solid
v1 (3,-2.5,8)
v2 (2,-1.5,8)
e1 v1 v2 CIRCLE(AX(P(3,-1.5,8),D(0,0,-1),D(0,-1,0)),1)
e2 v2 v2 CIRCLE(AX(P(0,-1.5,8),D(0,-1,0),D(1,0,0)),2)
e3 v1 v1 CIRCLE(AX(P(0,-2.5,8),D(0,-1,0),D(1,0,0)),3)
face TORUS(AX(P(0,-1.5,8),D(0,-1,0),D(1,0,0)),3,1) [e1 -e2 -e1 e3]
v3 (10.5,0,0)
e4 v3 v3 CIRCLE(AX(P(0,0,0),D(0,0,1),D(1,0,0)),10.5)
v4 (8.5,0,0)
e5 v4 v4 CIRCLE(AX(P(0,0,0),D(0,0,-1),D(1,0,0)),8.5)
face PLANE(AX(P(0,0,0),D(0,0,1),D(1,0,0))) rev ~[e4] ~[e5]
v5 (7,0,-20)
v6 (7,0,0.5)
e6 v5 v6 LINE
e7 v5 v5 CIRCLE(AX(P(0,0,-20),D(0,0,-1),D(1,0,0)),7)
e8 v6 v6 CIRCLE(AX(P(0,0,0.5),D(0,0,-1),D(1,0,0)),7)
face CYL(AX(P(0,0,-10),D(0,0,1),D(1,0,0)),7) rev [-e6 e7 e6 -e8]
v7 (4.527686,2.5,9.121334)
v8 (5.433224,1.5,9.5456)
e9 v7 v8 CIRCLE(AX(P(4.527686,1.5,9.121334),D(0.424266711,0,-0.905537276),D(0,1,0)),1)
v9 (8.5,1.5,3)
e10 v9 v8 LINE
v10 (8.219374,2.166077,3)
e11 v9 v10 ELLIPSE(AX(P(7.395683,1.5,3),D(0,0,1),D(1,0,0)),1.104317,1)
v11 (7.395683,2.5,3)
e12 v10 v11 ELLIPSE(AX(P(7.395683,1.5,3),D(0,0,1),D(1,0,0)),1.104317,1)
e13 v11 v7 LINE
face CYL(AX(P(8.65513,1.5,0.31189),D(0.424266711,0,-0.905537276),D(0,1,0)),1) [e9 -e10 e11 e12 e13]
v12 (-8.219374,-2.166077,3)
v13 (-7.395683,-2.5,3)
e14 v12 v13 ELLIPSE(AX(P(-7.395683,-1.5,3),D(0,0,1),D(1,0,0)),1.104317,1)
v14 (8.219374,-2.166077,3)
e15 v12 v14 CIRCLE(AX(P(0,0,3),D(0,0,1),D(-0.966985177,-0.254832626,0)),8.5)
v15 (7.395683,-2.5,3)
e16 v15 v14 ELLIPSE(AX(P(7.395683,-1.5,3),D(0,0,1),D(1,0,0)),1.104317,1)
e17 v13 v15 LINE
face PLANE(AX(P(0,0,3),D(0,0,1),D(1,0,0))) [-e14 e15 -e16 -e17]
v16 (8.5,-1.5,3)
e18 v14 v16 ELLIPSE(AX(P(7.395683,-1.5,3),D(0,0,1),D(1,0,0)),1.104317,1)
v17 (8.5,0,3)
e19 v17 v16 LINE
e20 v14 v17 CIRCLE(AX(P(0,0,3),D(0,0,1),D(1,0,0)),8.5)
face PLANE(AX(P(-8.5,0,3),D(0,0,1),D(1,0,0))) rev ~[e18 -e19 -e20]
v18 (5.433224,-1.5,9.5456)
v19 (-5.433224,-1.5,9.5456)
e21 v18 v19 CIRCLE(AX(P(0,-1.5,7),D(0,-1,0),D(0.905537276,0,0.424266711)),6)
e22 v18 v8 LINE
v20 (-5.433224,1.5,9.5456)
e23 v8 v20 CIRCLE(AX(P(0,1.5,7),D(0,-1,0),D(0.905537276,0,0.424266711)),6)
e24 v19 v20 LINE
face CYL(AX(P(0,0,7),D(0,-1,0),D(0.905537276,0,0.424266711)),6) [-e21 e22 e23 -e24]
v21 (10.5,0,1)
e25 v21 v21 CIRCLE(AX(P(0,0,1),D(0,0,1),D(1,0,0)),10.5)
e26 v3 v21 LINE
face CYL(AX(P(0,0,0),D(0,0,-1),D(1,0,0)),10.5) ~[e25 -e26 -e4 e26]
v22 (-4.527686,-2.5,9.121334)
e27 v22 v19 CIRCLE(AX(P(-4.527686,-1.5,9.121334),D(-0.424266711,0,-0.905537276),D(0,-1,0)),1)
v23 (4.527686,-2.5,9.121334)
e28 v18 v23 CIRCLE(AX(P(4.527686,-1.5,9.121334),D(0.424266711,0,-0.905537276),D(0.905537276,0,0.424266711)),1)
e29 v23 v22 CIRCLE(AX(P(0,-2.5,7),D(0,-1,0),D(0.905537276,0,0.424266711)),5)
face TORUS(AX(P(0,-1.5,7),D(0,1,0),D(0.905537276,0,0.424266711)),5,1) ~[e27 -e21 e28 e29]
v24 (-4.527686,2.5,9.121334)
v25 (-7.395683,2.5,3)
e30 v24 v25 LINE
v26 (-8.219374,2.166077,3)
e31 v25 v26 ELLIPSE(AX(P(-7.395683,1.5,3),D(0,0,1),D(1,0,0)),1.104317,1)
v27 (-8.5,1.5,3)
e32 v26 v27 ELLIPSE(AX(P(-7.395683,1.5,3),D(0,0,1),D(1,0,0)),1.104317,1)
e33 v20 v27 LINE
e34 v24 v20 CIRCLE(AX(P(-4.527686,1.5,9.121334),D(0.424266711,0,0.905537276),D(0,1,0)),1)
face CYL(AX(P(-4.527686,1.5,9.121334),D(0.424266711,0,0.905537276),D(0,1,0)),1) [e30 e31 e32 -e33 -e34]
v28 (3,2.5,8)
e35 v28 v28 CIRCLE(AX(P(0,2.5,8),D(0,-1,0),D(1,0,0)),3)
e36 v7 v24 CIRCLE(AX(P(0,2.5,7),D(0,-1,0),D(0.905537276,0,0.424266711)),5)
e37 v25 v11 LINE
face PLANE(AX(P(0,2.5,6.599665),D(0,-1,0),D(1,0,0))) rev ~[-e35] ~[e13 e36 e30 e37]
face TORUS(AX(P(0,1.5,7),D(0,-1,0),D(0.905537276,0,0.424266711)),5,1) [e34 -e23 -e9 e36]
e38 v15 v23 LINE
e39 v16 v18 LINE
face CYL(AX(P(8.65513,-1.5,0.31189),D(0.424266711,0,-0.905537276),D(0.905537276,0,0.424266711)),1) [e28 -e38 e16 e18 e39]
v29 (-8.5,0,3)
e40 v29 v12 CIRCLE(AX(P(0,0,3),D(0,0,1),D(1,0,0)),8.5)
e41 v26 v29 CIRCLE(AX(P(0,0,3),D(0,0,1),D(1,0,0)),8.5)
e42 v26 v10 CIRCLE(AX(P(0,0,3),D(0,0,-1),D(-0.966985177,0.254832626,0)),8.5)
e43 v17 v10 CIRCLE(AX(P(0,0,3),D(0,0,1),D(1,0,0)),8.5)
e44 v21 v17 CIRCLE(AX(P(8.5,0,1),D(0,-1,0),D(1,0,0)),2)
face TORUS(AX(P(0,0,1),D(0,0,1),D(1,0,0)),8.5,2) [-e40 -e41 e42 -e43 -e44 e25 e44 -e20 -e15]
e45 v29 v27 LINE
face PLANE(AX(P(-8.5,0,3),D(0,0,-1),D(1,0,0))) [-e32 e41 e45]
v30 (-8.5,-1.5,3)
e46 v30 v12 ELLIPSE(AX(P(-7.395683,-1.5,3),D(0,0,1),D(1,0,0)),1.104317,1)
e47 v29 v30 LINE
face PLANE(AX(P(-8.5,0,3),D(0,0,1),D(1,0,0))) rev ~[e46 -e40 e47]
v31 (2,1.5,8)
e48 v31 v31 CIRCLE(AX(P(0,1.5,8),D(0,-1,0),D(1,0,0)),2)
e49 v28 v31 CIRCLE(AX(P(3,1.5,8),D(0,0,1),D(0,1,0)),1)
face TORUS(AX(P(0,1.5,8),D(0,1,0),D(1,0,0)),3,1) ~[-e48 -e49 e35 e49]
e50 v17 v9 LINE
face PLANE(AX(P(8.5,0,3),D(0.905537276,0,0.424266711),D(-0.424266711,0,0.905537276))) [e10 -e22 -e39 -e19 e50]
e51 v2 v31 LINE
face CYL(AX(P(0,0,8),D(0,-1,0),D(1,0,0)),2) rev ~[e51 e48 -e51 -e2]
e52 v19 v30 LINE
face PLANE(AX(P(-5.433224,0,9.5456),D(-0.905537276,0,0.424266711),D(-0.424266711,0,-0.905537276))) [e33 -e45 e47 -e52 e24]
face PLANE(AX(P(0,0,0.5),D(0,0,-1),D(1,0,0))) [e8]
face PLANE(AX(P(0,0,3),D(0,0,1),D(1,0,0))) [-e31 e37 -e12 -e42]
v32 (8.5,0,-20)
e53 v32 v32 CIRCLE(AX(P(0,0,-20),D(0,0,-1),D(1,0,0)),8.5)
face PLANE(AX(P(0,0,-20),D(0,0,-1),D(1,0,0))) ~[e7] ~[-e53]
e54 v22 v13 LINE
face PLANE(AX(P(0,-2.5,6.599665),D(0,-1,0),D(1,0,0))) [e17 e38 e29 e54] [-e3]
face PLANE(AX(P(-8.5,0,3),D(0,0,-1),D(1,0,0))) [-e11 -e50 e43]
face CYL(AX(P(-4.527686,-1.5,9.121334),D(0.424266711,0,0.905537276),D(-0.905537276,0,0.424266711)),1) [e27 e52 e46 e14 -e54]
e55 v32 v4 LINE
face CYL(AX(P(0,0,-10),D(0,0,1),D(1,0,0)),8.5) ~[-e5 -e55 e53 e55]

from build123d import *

# Parameters (mm, degrees)
F0_R          = 10.5
F1_DEPTH      = 3
F2_R          = 2
F3_R          = 7
F4_DEPTH      = 0.5
F5_W          = 1.5
F5_H          = 20
F7_R          = 2
F8_DEPTH      = 2.5
F8_DEPTH_BACK = 2.5
F9_T8_DEPTH   = 9.7284161474
F9_T13_DEPTH  = 9.7284161474
F9_T16_ANGLE  = 129.7914851202
F9_T20_DEPTH  = 9.7284161474
F9_T23_ANGLE  = 129.7914851202
F9_T27_DEPTH  = 9.7284161474


# Not quite as in the source:
# - a fillet or chamfer that OpenCascade refuses, or shapes differently, is made with other operations: its cross-section is extruded or revolved along the edge and cut away or added


with BuildPart() as f1:
    # F0 (on Top) → F1 (new body)
    with BuildSketch(Plane.XY):
        Circle(F0_R)
    extrude(amount=F1_DEPTH)

    # F2
    f2_edges = [f1.edges().sort_by_distance(p)[0] for p in [
        (-10.5, 0, 3),
    ]]
    fillet(f2_edges, radius=F2_R)

    # F3 (on face) → F4 (cut)
    with BuildSketch(Plane(origin=(0, 0, 0), x_dir=(1, 0, 0), z_dir=(0, 0, -1))):
        Circle(F3_R)
    extrude(amount=-F4_DEPTH, mode=Mode.SUBTRACT)

    # F5 (on Front) → F6 (revolve)
    with BuildSketch(Plane.XZ):
        with Locations((7.75, -10)):
            Rectangle(F5_W, F5_H)
    revolve(axis=Axis((0, 0, -11.0487695783), (0, 0, -1)))

    # F7 (on Front) → F8 (join, two sides)
    with BuildSketch(Plane.XZ) as f8_sk:
        with BuildLine():
            Line((-5.4332236548, 9.5456002665), (-8.5, 3))
            Line((-8.5, 3), (8.5, 3))
            Line((8.5, 3), (5.4332236548, 9.5456002665))
            ThreePointArc((5.4332236548, 9.5456002665), (0, 13), (-5.4332236548, 9.5456002665))
        make_face()
        with Locations((0, 8)):
            Circle(F7_R, mode=Mode.SUBTRACT)
    extrude(amount=F8_DEPTH)
    extrude(f8_sk.sketch, amount=-F8_DEPTH_BACK)

    # F9: fillet of radius 1 on 4 edges, made by hand

    # F9_s1 → F9_t2 (revolve, cut)
    with BuildSketch(Plane.XY.offset(8)):
        with BuildLine():
            ThreePointArc((3, 2.5), (2.2928932188, 2.2071067812), (2, 1.5))
            Line((2, 1.5), (2, 2.5))
            Line((2, 2.5), (3, 2.5))
        make_face()
    revolve(axis=Axis((0, 2.5, 8), (0, -1, 0)), mode=Mode.SUBTRACT)

    # F9_s3 → F9_t4 (revolve, cut)
    with BuildSketch(Plane.XY.offset(8)):
        with BuildLine():
            ThreePointArc((3, -2.5), (2.2928932188, -2.2071067812), (2, -1.5))
            Line((2, -1.5), (2, -2.5))
            Line((2, -2.5), (3, -2.5))
        make_face()
    revolve(axis=Axis((0, -2.5, 8), (0, -1, 0)), mode=Mode.SUBTRACT)


with BuildPart() as f9_tool6:
    # F9_s7 → F9_t8 (new body)
    with BuildSketch(Plane(origin=(1.4381178705, 0, -3.0694591509), x_dir=(0, 1, 0), z_dir=(-0.4242667111, 0, 0.9055372758))):
        with BuildLine():
            ThreePointArc((-1.5, -8.9698669776), (-2.2071067812, -8.6769737588), (-2.5, -7.9698669776))
            Line((-2.5, -7.9698669776), (-2.5, -8.9698669776))
            Line((-2.5, -8.9698669776), (-1.5, -8.9698669776))
        make_face()
    extrude(amount=F9_T8_DEPTH)

    split(bisect_by=Plane.XY.offset(3), keep=Keep.TOP)


with BuildPart() as f1_1:
    add(f1.part)

    # F9_t5: cut F9_tool6
    add(f9_tool6.part, mode=Mode.SUBTRACT)


with BuildPart() as f9_tool11:
    # F9_s12 → F9_t13 (new body)
    with BuildSketch(Plane(origin=(1.4381178705, 0, -3.0694591509), x_dir=(0, 1, 0), z_dir=(-0.4242667111, 0, 0.9055372758))):
        with BuildLine():
            ThreePointArc((2.5, -7.9698669776), (2.2071067812, -8.6769737588), (1.5, -8.9698669776))
            Line((1.5, -8.9698669776), (2.5, -8.9698669776))
            Line((2.5, -8.9698669776), (2.5, -7.9698669776))
        make_face()
    extrude(amount=F9_T13_DEPTH)

    split(bisect_by=Plane.XY.offset(3), keep=Keep.TOP)


with BuildPart() as f1_2:
    add(f1_1.part)

    # F9_t10: cut F9_tool11
    add(f9_tool11.part, mode=Mode.SUBTRACT)

    # F9_s15 → F9_t16 (revolve, cut)
    with BuildSketch(Plane(origin=(-2.6893252524, 0, 5.7399843051), x_dir=(0, 1, 0), z_dir=(0.4242667111, 0, -0.9055372758))):
        with BuildLine():
            ThreePointArc((2.5, 7.9698669776), (2.2071067812, 8.6769737588), (1.5, 8.9698669776))
            Line((1.5, 8.9698669776), (2.5, 8.9698669776))
            Line((2.5, 8.9698669776), (2.5, 7.9698669776))
        make_face()
    revolve(axis=Axis((0, 2.5, 7), (0, -1, 0)), revolution_arc=F9_T16_ANGLE, mode=Mode.SUBTRACT)


with BuildPart() as f9_tool18:
    # F9_s19 → F9_t20 (new body)
    with BuildSketch(Plane(origin=(2.6893252524, 0, 5.7399843051), x_dir=(0, 1, 0), z_dir=(-0.4242667111, 0, -0.9055372758))):
        with BuildLine():
            ThreePointArc((2.5, -7.9698669776), (2.2071067812, -8.6769737588), (1.5, -8.9698669776))
            Line((1.5, -8.9698669776), (2.5, -8.9698669776))
            Line((2.5, -8.9698669776), (2.5, -7.9698669776))
        make_face()
    extrude(amount=F9_T20_DEPTH)

    split(bisect_by=Plane.XY.offset(3), keep=Keep.TOP)


with BuildPart() as f1_3:
    add(f1_2.part)

    # F9_t17: cut F9_tool18
    add(f9_tool18.part, mode=Mode.SUBTRACT)

    # F9_s22 → F9_t23 (revolve, cut)
    with BuildSketch(Plane(origin=(-2.6893252524, 0, 5.7399843051), x_dir=(0, 1, 0), z_dir=(0.4242667111, 0, -0.9055372758))):
        with BuildLine():
            ThreePointArc((-2.5, 7.9698669776), (-2.2071067812, 8.6769737588), (-1.5, 8.9698669776))
            Line((-1.5, 8.9698669776), (-2.5, 8.9698669776))
            Line((-2.5, 8.9698669776), (-2.5, 7.9698669776))
        make_face()
    revolve(axis=Axis((0, -2.5, 7), (0, -1, 0)), revolution_arc=F9_T23_ANGLE, mode=Mode.SUBTRACT)


with BuildPart() as f9_tool25:
    # F9_s26 → F9_t27 (new body)
    with BuildSketch(Plane(origin=(2.6893252524, 0, 5.7399843051), x_dir=(0, 1, 0), z_dir=(-0.4242667111, 0, -0.9055372758))):
        with BuildLine():
            ThreePointArc((-1.5, -8.9698669776), (-2.2071067812, -8.6769737588), (-2.5, -7.9698669776))
            Line((-2.5, -7.9698669776), (-2.5, -8.9698669776))
            Line((-2.5, -8.9698669776), (-1.5, -8.9698669776))
        make_face()
    extrude(amount=F9_T27_DEPTH)

    split(bisect_by=Plane.XY.offset(3), keep=Keep.TOP)


with BuildPart() as f1_4:
    add(f1_3.part)

    # F9_t24: cut F9_tool25
    add(f9_tool25.part, mode=Mode.SUBTRACT)


solid = f1_4.part
